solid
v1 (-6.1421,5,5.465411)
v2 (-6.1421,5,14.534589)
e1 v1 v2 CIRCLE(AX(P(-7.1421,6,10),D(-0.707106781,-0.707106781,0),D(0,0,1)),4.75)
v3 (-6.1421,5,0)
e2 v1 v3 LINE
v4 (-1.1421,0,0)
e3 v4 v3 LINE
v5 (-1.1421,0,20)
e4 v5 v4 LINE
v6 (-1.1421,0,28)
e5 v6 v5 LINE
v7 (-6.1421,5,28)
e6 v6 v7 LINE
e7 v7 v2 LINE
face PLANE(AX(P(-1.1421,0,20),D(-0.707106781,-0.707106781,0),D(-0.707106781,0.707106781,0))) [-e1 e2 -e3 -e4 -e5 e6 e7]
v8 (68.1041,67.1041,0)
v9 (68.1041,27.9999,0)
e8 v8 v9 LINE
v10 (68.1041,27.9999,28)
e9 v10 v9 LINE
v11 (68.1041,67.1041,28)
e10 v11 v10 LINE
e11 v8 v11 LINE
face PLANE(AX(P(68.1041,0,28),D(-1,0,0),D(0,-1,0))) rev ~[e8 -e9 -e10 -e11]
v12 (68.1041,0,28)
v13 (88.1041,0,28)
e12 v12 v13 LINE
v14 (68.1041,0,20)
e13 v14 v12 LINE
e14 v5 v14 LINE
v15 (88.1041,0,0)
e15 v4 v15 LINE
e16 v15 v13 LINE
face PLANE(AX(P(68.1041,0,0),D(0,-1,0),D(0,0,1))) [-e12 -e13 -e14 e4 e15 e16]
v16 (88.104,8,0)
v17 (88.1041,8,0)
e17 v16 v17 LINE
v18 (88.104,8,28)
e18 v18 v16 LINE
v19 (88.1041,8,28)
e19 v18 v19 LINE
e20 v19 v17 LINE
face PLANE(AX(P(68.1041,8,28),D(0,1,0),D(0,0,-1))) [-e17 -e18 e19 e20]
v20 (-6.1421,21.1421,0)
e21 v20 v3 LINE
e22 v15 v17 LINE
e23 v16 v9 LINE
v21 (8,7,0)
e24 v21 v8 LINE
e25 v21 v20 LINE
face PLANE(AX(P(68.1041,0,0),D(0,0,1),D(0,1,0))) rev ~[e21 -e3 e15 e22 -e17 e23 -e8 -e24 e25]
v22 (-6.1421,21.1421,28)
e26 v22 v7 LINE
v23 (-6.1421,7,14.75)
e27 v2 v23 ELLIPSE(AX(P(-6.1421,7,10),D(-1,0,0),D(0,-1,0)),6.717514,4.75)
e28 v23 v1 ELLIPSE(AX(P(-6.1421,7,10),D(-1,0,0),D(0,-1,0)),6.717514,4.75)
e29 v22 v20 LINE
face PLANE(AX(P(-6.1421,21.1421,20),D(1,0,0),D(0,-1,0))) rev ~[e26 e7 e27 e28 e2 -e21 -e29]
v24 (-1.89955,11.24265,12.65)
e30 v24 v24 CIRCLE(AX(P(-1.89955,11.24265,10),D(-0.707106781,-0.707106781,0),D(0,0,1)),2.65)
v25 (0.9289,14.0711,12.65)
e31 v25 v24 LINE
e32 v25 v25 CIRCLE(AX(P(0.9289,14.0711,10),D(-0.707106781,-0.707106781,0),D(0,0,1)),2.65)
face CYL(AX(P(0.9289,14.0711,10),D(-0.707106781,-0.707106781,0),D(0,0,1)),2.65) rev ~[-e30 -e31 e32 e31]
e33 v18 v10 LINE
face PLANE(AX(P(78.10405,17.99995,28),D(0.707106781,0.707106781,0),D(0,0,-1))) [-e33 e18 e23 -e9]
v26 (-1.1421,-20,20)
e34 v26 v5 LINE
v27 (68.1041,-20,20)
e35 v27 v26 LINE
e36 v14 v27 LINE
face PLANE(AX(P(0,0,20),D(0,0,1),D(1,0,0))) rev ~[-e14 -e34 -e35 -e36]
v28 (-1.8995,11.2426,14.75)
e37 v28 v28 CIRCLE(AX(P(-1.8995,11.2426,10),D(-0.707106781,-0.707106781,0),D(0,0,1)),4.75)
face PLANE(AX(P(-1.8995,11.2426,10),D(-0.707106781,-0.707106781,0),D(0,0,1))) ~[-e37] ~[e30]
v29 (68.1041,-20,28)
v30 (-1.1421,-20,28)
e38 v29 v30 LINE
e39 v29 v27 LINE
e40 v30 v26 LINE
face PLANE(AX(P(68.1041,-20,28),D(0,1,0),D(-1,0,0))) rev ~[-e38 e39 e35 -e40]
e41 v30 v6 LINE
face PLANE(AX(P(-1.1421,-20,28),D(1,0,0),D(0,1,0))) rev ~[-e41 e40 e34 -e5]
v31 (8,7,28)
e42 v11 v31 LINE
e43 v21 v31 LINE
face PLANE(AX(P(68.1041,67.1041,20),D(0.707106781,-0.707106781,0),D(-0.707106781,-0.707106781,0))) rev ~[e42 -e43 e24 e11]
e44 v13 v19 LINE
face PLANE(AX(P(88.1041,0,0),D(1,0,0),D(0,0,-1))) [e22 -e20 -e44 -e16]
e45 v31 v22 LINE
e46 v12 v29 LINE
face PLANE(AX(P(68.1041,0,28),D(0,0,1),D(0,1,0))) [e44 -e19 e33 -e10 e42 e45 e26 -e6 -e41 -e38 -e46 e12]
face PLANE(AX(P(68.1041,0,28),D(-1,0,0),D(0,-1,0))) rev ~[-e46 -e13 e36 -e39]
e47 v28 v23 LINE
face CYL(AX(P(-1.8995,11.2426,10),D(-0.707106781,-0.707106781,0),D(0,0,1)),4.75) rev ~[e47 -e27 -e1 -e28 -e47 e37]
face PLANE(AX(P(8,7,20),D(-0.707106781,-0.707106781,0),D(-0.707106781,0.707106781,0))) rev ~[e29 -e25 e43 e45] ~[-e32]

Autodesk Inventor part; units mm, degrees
ref_plane "YZ Plane" through (0, 0, 0) normal (1, 0, 0) x (0, 1, 0)
sketch "スケッチ1" plane through (0, 0, 0) normal (0, 0, 1) x (1, 0, 0)
  line L0 (0, 0) -> (8, 0)
  line L1 (8, 0) -> (8, 7)
  line L2 (8, 7) -> (0, 7)
  line L3 (0, 7) -> (0, 0)
  line L4 (8, 7) -> (68.1041, 67.1041)
  line L5 (68.1041, 67.1041) -> (68.1041, 0)
  line L6 (68.1041, 0) -> (-2.6124, 0)
  dimension "d0" = 8
  dimension "d1" = 7
  dimension "d3" = 85
  dimension "d245" = 45
extrude "押し出し1" add sketch "スケッチ1" along normal blind 20
sketch "スケッチ15" plane through (0, 0, 20) normal (0, 0, 1) x (1, 0, 0)
  line L0 (68.1041, 67.1041) -> (8, 7) projected
  line L1 (8, 7) -> (0, 7) projected
  line L2 (0, 7) -> (0, 0) projected
  line L3 (8, 7) -> (-6.1421, 21.1421)
  line L4 (-6.1421, 21.1421) -> (-6.1421, 0)
  line L5 (-6.1421, 0) -> (0, 0)
  dimension "d92" = 20
extrude "押し出し10" add sketch "スケッチ15" against normal up to surface (20 mm away)
chamfer "面取り7" distance 5 angle 45 1 edges at (-6.1421, 0, 10)
sketch "スケッチ16" plane through (-6.1421, 21.1421, 20) normal (0.7071068, 0.7071068, 0) x (0, 0, -1)
  point P0 (20, -19.2929)
  point P1 (10, -10)
hole "穴6" at (0.9289, 14.0711, 10) direction (-0.7071068, -0.7071068, 0) diameter 5.3 depth 58
ref_plane "作業平面2" through (-8.9706, 18.3137, 20) normal (0.7071068, 0.7071068, 0) x (0, 0, -1)
sketch "スケッチ17" plane through (-8.9706, 18.3137, 20) normal (0.7071068, 0.7071068, 0) x (0, 0, -1)
  arc A0 (12.2411, -11.4142) -> (7.7589, -11.4142) centre (10, -10) ccw projected
  point P0 (20, -19.2929)
hole "穴7" at (-1.8995, 11.2426, 10) direction (-0.7071068, -0.7071068, 0) diameter 9.5 depth 58
sketch "スケッチ18" plane through (68.1041, 67.1041, 20) normal (-0.7071068, 0.7071068, 0) x (0.7071068, 0.7071068, 0)
  line L0 (0, 20) -> (-85, 20) projected
  line L1 (-85, 20) -> (-85, 0) projected
  line L2 (0, 20) -> (0, 0) projected
  point P0 (-95.6066, 20)
  point P1 (-75, 10)
  point P2 (-42.5, 10)
  point P3 (-10, 10)
  dimension "d119" = 10
  dimension "d120" = 10
  dimension "d121" = 10
  dimension "d122" = 32.5
hole "穴8" [suppressed]
ref_plane "作業平面3" through (72.3467, 62.8614, 20) normal (-0.7071068, 0.7071068, 0) x (0.7071068, 0.7071068, 0)
sketch "スケッチ19" plane through (72.3467, 62.8614, 20) normal (-0.7071068, 0.7071068, 0) x (0.7071068, 0.7071068, 0)
  line L0 (0, 20) -> (-85, 20) projected
  line L1 (-85, 20) -> (-85, 0) projected
  line L2 (0, 0) -> (-85, 0) projected
  line L3 (0, 20) -> (0, 0) projected
  point P0 (-95.6066, 20)
hole "穴9" [suppressed]
sketch "スケッチ20" plane through (0, 0, 20) normal (0, 0, 1) x (1, 0, 0)
  line L0 (68.1041, 0) -> (68.1041, 67.1041) projected
  line L1 (68.1041, 67.1041) -> (8, 7) projected
  line L2 (-6.1421, 21.1421) -> (-6.1421, 0) projected
  line L3 (68.1041, 67.1041) -> (8, 7)
  line L4 (8, 7) -> (-6.1421, 21.1421)
  line L5 (-6.1421, 21.1421) -> (53.9619, 81.2462)
  line L6 (53.9619, 81.2462) -> (68.1041, 67.1041)
  line L7 (-5.2583, 14.6014) -> (1.4593, 7.8839) projected
  line L8 (-1.1421, 0) -> (-6.1421, 5) projected
  line L9 (-1.1421, 0) -> (68.1041, 0) projected
  line L10 (68.1041, 0) -> (68.1041, 67.1041) projected
  line L11 (68.1041, 67.1041) -> (8, 7) projected
  line L12 (8, 7) -> (-6.1421, 21.1421) projected
  line L13 (-6.1421, 21.1421) -> (-6.1421, 5) projected
  point P0 (-3.4715, 23.383)
  point P1 (-3.4715, 23.383)
  point P2 (-6.1421, 0)
extrude "押し出し11" add sketch "スケッチ20" along normal blind 8 contours L9 L8 L2 L4 L1 L0
sketch "スケッチ21" plane through (0, 0, 28) normal (0, 0, 1) x (1, 0, 0)
  line L0 (68.1041, 67.1041) -> (8, 7) projected
  line L1 (8, 7) -> (-6.1421, 21.1421) projected
  line L2 (-6.1421, 21.1421) -> (-6.1421, 5) projected
  line L3 (-6.1421, 5) -> (-1.1421, 0) projected
  line L4 (-1.1421, 0) -> (68.1041, 0) projected
  line L5 (68.1041, 0) -> (68.1041, 67.1041) projected
  line L6 (-1.1421, 0) -> (68.1041, 0)
  line L7 (68.1041, 0) -> (68.1041, -20)
  line L8 (68.1041, -20) -> (-1.1421, -20)
  line L9 (-1.1421, -20) -> (-1.1421, 0)
  dimension "d247" = 20
extrude "押し出し12" add sketch "スケッチ21" against normal blind 8 contours L7 L8 L9 L4
sketch "スケッチ23" plane through (68.1041, 0, 0) normal (1, 0, 0) x (0, 0, -1)
  line L0 (0, 0) -> (0, 67.1041) projected
  line L1 (0, 0) -> (-20, 0)
  line L2 (0, 0) -> (-28, 0)
  line L3 (-28, 0) -> (-28, 8)
  line L4 (-28, 8) -> (0, 8)
  line L5 (0, 8) -> (0, 0)
  point P0 (-28, 55.754)
  point P1 (0, 8)
extrude "押し出し13" add sketch "スケッチ23" along normal blind 20
chamfer "面取り8" distance 20 angle 45 1 edges at (68.1041, 8, 14)
sketch "スケッチ24" plane through (1.5285, 0, 20) normal (0, -1, 0) x (1, 0, 0)
  line L0 (96.0995, -20) -> (0, -20) projected
  line L1 (96.0995, 8) -> (96.0995, -20) projected
  point P0 (-1.5285, -20)
  point P1 (86.0995, -10)
  dimension "d161" = 10
  dimension "d162" = 10
hole "穴11" [suppressed]
sketch "スケッチ25" plane through (1.5285, 6, 20) normal (0, -1, 0) x (1, 0, 0)
  circle A0 centre (86.0995, -10) radius 2.15 projected
  point P0 (-1.5285, -20)
sketch "スケッチ27" plane through (0, 0, 28) normal (0, 0, 1) x (1, 0, 0)
  line L0 (68.1041, -20) -> (68.1041, 0) projected
  line L1 (77.6279, 0) -> (97.6279, 0) projected
  line L2 (77.6279, -20) -> (1.5285, -20) projected
  line L3 (97.6279, 0) -> (1.5285, 0) projected
  line L4 (77.6279, -20) -> (97.6279, -20)
  line L5 (97.6279, -20) -> (97.6279, 0)
  line L6 (97.6279, 0) -> (77.6279, 0)
  line L7 (77.6279, 0) -> (77.6279, -20)
  point P0 (0, 0)
sketch "スケッチ22" plane through (0, 0, 28) normal (0, 0, 1) x (1, 0, 0)
  line L0 (1.5285, 0) -> (1.5285, -20) projected
  line L1 (1.5285, -20) -> (77.6279, -20) projected
  line L2 (97.6279, 8) -> (97.6279, -20) projected
  point P0 (0, 0)
  point P1 (11.5285, -10)
  point P2 (36.895, -10)
  point P3 (62.2614, -10)
  point P4 (87.6279, -10)
  dimension "d143" = 10
  dimension "d144" = 10
  dimension "d185" = 10
  dimension "d186" = 76.0995
  dimension "d187" = 25.3665
  dimension "d188" = 25.3665
sketch "スケッチ28" plane through (0, 0, 20) normal (0, 0, -1) x (-1, 0, 0)
  line L0 (-77.6279, 55.754) -> (-71.9329, 63.8873) projected
  line L1 (-77.6279, 55.754) -> (-8, 7) projected
  line L2 (-8, 7) -> (3.4715, 23.383) projected
  line L3 (-2.2642, 15.1915) -> (-101.3499, 84.572)
  line L4 (-68.1041, 67.1041) -> (-8, 7) projected
  line L5 (-39.5723, 38.5723) -> (-36.5318, 35.5318) projected
  line L6 (-16.5913, 15.5913) -> (-13.5508, 12.5508) projected
  line L7 (-62.5533, 61.5533) -> (-59.5127, 58.5127) projected
  line L8 (-70.2375, 50.5791) -> (-66.7686, 48.1502) projected
  line L9 (-68.1041, 67.1041) -> (-8, 7) projected
  point P0 (0, 0)
  point P1 (-10.4558, 20.9273)
  point P2 (-37.0782, 39.5685)
  point P3 (-63.7006, 58.2098)
  dimension "d196" = 10
  dimension "d197" = 32.5
  dimension "d198" = 65
sketch "スケッチ29" plane through (0, 0, 28) normal (0, 0, 1) x (1, 0, 0)
  circle A0 centre (37.0782, 39.5685) radius 2.15 projected
  circle A1 centre (10.4558, 20.9273) radius 2.15 projected
  circle A2 centre (63.7006, 58.2098) radius 2.15 projected
  point P0 (0, 0)
sketch "スケッチ30" plane through (0, 0, 28) normal (0, 0, 1) x (1, 0, 0)
  circle A0 centre (10.4558, 20.9273) radius 4 projected
  point P0 (0, 0)
sketch "スケッチ31" plane through (1.5285, 0, 0) normal (0, -1, 0) x (1, 0, 0)
  ellipse E0 centre (23.5807, 10) end of major axis (28.4638, 10) minor radius 4 projected
  ellipse E1 centre (63.2559, 10) end of major axis (68.139, 10) minor radius 4 projected
  circle A0 centre (86.0995, 10) radius 2.15 projected
  line L0 (96.0995, 20) -> (96.0995, 0) projected
  line L1 (0, 0) -> (0, 20) projected
  line L2 (96.0995, 7.1) -> (0, 7.1)
  line L3 (0, 7.1) -> (0, 12.9)
  line L4 (0, 12.9) -> (96.0995, 12.9)
  line L5 (96.0995, 12.9) -> (96.0995, 7.1)
  line L6 (51.228, 7.1) -> (36.228, 7.1)
  line L7 (36.228, 7.1) -> (36.228, 12.9)
  line L8 (36.228, 12.9) -> (51.228, 12.9)
  line L9 (51.228, 12.9) -> (51.228, 7.1)
  line L10 (9.7875, 12.9) -> (0, 12.9)
  line L11 (0, 12.9) -> (0, 7.1)
  line L12 (0, 7.1) -> (9.7875, 7.1)
  line L13 (9.7875, 7.1) -> (9.7875, 12.9)
  line L14 (76.0995, 7.1) -> (71.0995, 7.1)
  line L15 (71.0995, 7.1) -> (71.0995, 12.9)
  line L16 (71.0995, 12.9) -> (76.0995, 12.9)
  line L17 (76.0995, 12.9) -> (76.0995, 7.1)
  point P0 (96.0995, 2)
  point P1 (-1.5285, 0)
  point P2 (0, 7.1)
  point P3 (20.2175, 7.1)
  point P4 (20.2175, 12.9)
  point P5 (59.8927, 7.1)
  point P6 (59.8927, 12.9)
  point P7 (26.944, 12.9)
  point P8 (26.944, 7.1)
  point P9 (76.0995, 12.9)
  point P10 (66.6191, 12.9)
  point P11 (66.6191, 7.1)
  dimension "d220" = 5.8
  dimension "d221" = 2.9
  dimension "d223" = 15
  dimension "d224" = 10
sketch "スケッチ33" plane through (42.2947, 32.8094, 10) normal (0.7071068, -0.7071068, 0) x (0, 0, 1)
  circle A0 centre (0, 0) radius 4 projected
  circle A1 centre (0, 32.5) radius 2.15 projected
  circle A2 centre (0, 32.5) radius 4 projected
  point P0 (-10, 53.1066)
sketch "スケッチ34" plane through (87.6279, -10, 24) normal (0, 0, 1) x (1, 0, 0)
  circle A0 centre (0, 0) radius 2.15 projected
  circle A1 centre (-25.3665, 0) radius 4 projected
  circle A2 centre (-25.3665, 0) radius 2.15 projected
  circle A3 centre (-76.0995, 0) radius 2.15 projected
  circle A4 centre (-77.1722, 30.9273) radius 2.65 projected
  circle A5 centre (-50.5497, 49.5685) radius 2.15 projected
  circle A6 centre (-23.9273, 68.2098) radius 2.15 projected
  circle A7 centre (-23.9273, 68.2098) radius 4 projected
  line L0 (2.15, 2.15) -> (-2.15, 2.15)
  line L1 (-2.15, 2.15) -> (-2.15, -2.15)
  line L2 (-2.15, -2.15) -> (2.15, -2.15)
  line L3 (2.15, -2.15) -> (2.15, 2.15)
  line L4 (2.15, 2.15) -> (-2.15, -2.15) construction
  line L5 (-2.15, 2.15) -> (2.15, -2.15) construction
  line L6 (-23.2165, 2.15) -> (-27.5165, 2.15)
  line L7 (-27.5165, 2.15) -> (-27.5165, -2.15)
  line L8 (-27.5165, -2.15) -> (-23.2165, -2.15)
  line L9 (-23.2165, -2.15) -> (-23.2165, 2.15)
  line L10 (-23.2165, 2.15) -> (-27.5165, -2.15) construction
  line L11 (-27.5165, 2.15) -> (-23.2165, -2.15) construction
  line L12 (-73.9495, 2.15) -> (-78.2495, 2.15)
  line L13 (-78.2495, 2.15) -> (-78.2495, -2.15)
  line L14 (-78.2495, -2.15) -> (-73.9495, -2.15)
  line L15 (-73.9495, -2.15) -> (-73.9495, 2.15)
  line L16 (-73.9495, 2.15) -> (-78.2495, -2.15) construction
  line L17 (-78.2495, 2.15) -> (-73.9495, -2.15) construction
  line L18 (-74.5222, 33.5773) -> (-79.8222, 33.5773)
  line L19 (-79.8222, 33.5773) -> (-79.8222, 28.2773)
  line L20 (-79.8222, 28.2773) -> (-74.5222, 28.2773)
  line L21 (-74.5222, 28.2773) -> (-74.5222, 33.5773)
  line L22 (-74.5222, 33.5773) -> (-79.8222, 28.2773) construction
  line L23 (-79.8222, 33.5773) -> (-74.5222, 28.2773) construction
  line L24 (-48.3997, 51.7185) -> (-52.6997, 51.7185)
  line L25 (-52.6997, 51.7185) -> (-52.6997, 47.4185)
  line L26 (-52.6997, 47.4185) -> (-48.3997, 47.4185)
  line L27 (-48.3997, 47.4185) -> (-48.3997, 51.7185)
  line L28 (-48.3997, 51.7185) -> (-52.6997, 47.4185) construction
  line L29 (-52.6997, 51.7185) -> (-48.3997, 47.4185) construction
  line L30 (-21.7773, 70.3598) -> (-26.0773, 70.3598)
  line L31 (-26.0773, 70.3598) -> (-26.0773, 66.0598)
  line L32 (-26.0773, 66.0598) -> (-21.7773, 66.0598)
  line L33 (-21.7773, 66.0598) -> (-21.7773, 70.3598)
  line L34 (-21.7773, 70.3598) -> (-26.0773, 66.0598) construction
  line L35 (-26.0773, 70.3598) -> (-21.7773, 66.0598) construction
  circle A8 centre (-23.9273, 68.2098) radius 2.15 projected
  circle A9 centre (-50.733, 0) radius 2.15 projected
  line L36 (-52.883, 2.15) -> (-48.583, 2.15)
  line L37 (-48.583, 2.15) -> (-48.583, -2.15)
  line L38 (-48.583, -2.15) -> (-52.883, -2.15)
  line L39 (-52.883, -2.15) -> (-52.883, 2.15)
  line L40 (-52.883, 2.15) -> (-48.583, -2.15) construction
  line L41 (-48.583, 2.15) -> (-52.883, -2.15) construction
  point P0 (-87.6279, 10)
sketch "スケッチ35" plane through (87.6279, -10, 24) normal (0, 0, 1) x (1, 0, 0)
  line L0 (2.15, -2.15) -> (-2.15, -2.15) projected
  line L1 (-2.15, 2.15) -> (2.15, 2.15) projected
  circle A0 centre (0, 0) radius 4 projected
  line L2 (-23.2165, 2.15) -> (-23.2165, -2.15) projected
  line L3 (-23.2165, -2.15) -> (-27.5165, -2.15) projected
  line L4 (-27.5165, -2.15) -> (-27.5165, 2.15) projected
  line L5 (-27.5165, 2.15) -> (-23.2165, 2.15) projected
  circle A1 centre (-25.3665, 0) radius 4 projected
  line L6 (-52.883, 2.15) -> (-48.583, 2.15) projected
  line L7 (-48.583, 2.15) -> (-48.583, -2.15) projected
  line L8 (-48.583, -2.15) -> (-52.883, -2.15) projected
  line L9 (-52.883, -2.15) -> (-52.883, 2.15) projected
  circle A2 centre (-50.733, 0) radius 4 projected
  line L10 (-78.2495, 2.15) -> (-73.9495, 2.15) projected
  line L11 (-73.9495, 2.15) -> (-73.9495, -2.15) projected
  line L12 (-73.9495, -2.15) -> (-78.2495, -2.15) projected
  line L13 (-78.2495, -2.15) -> (-78.2495, 2.15) projected
  circle A3 centre (-76.0995, 0) radius 4 projected
  circle A4 centre (-77.1722, 30.9273) radius 4.75 projected
  circle A5 centre (-50.5497, 49.5685) radius 4 projected
  circle A6 centre (-23.9273, 68.2098) radius 4 projected
  line L14 (18.1594, -2.15) -> (-105.0634, -2.15)
  line L15 (-105.0634, -2.15) -> (-105.0634, 2.15)
  line L16 (-105.0634, 2.15) -> (18.1594, 2.15)
  line L17 (18.1594, 2.15) -> (18.1594, -2.15)
  circle A7 centre (-23.9273, 68.2098) radius 4 projected
  line L18 (-21.7773, 71.5828) -> (-26.0773, 71.5828)
  line L19 (-26.0773, 71.5828) -> (-26.0773, 64.8367)
  line L20 (-26.0773, 64.8367) -> (-21.7773, 64.8367)
  line L21 (-21.7773, 64.8367) -> (-21.7773, 71.5828)
  line L22 (-21.7773, 71.5828) -> (-26.0773, 64.8367) construction
  line L23 (-26.0773, 71.5828) -> (-21.7773, 64.8367) construction
  circle A8 centre (-50.5497, 49.5685) radius 4 projected
  line L24 (-52.6997, 46.1955) -> (-48.3997, 46.1955)
  line L25 (-48.3997, 46.1955) -> (-48.3997, 52.9416)
  line L26 (-48.3997, 52.9416) -> (-52.6997, 52.9416)
  line L27 (-52.6997, 52.9416) -> (-52.6997, 46.1955)
  line L28 (-52.6997, 46.1955) -> (-48.3997, 52.9416) construction
  line L29 (-48.3997, 46.1955) -> (-52.6997, 52.9416) construction
  circle A9 centre (-77.1722, 30.9273) radius 4.75 projected
  line L30 (-74.5222, 34.8694) -> (-79.8222, 34.8694)
  line L31 (-79.8222, 34.8694) -> (-79.8222, 26.9852)
  line L32 (-79.8222, 26.9852) -> (-74.5222, 26.9852)
  line L33 (-74.5222, 26.9852) -> (-74.5222, 34.8694)
  line L34 (-74.5222, 34.8694) -> (-79.8222, 26.9852) construction
  line L35 (-79.8222, 34.8694) -> (-74.5222, 26.9852) construction
  point P0 (-87.6279, 10)
  point P1 (-3.3731, 2.15)
  point P2 (-3.3731, -2.15)
  point P3 (3.3731, -2.15)
  point P4 (3.3731, 2.15)
  point P5 (-28.7395, 2.15)
  point P6 (-28.7395, -2.15)
  point P7 (-21.9934, -2.15)
  point P8 (-21.9934, 2.15)
  point P9 (-54.106, 2.15)
  point P10 (-54.106, -2.15)
  point P11 (-47.3599, -2.15)
  point P12 (-47.3599, 2.15)
  point P13 (-72.7264, 2.15)
  point P14 (-79.4725, 2.15)
  point P15 (-79.4725, -2.15)
  point P16 (-72.7264, -2.15)
  point P17 (-48.3997, 52.9416)
  point P18 (-52.6997, 52.9416)
  point P19 (-21.7773, 71.5828)
  point P20 (-26.0773, 71.5828)
equation "\"d187\" = 0.333333 * d186"
equation "\"d188\" = d187"
properties part number "Print_Parts_L1"
